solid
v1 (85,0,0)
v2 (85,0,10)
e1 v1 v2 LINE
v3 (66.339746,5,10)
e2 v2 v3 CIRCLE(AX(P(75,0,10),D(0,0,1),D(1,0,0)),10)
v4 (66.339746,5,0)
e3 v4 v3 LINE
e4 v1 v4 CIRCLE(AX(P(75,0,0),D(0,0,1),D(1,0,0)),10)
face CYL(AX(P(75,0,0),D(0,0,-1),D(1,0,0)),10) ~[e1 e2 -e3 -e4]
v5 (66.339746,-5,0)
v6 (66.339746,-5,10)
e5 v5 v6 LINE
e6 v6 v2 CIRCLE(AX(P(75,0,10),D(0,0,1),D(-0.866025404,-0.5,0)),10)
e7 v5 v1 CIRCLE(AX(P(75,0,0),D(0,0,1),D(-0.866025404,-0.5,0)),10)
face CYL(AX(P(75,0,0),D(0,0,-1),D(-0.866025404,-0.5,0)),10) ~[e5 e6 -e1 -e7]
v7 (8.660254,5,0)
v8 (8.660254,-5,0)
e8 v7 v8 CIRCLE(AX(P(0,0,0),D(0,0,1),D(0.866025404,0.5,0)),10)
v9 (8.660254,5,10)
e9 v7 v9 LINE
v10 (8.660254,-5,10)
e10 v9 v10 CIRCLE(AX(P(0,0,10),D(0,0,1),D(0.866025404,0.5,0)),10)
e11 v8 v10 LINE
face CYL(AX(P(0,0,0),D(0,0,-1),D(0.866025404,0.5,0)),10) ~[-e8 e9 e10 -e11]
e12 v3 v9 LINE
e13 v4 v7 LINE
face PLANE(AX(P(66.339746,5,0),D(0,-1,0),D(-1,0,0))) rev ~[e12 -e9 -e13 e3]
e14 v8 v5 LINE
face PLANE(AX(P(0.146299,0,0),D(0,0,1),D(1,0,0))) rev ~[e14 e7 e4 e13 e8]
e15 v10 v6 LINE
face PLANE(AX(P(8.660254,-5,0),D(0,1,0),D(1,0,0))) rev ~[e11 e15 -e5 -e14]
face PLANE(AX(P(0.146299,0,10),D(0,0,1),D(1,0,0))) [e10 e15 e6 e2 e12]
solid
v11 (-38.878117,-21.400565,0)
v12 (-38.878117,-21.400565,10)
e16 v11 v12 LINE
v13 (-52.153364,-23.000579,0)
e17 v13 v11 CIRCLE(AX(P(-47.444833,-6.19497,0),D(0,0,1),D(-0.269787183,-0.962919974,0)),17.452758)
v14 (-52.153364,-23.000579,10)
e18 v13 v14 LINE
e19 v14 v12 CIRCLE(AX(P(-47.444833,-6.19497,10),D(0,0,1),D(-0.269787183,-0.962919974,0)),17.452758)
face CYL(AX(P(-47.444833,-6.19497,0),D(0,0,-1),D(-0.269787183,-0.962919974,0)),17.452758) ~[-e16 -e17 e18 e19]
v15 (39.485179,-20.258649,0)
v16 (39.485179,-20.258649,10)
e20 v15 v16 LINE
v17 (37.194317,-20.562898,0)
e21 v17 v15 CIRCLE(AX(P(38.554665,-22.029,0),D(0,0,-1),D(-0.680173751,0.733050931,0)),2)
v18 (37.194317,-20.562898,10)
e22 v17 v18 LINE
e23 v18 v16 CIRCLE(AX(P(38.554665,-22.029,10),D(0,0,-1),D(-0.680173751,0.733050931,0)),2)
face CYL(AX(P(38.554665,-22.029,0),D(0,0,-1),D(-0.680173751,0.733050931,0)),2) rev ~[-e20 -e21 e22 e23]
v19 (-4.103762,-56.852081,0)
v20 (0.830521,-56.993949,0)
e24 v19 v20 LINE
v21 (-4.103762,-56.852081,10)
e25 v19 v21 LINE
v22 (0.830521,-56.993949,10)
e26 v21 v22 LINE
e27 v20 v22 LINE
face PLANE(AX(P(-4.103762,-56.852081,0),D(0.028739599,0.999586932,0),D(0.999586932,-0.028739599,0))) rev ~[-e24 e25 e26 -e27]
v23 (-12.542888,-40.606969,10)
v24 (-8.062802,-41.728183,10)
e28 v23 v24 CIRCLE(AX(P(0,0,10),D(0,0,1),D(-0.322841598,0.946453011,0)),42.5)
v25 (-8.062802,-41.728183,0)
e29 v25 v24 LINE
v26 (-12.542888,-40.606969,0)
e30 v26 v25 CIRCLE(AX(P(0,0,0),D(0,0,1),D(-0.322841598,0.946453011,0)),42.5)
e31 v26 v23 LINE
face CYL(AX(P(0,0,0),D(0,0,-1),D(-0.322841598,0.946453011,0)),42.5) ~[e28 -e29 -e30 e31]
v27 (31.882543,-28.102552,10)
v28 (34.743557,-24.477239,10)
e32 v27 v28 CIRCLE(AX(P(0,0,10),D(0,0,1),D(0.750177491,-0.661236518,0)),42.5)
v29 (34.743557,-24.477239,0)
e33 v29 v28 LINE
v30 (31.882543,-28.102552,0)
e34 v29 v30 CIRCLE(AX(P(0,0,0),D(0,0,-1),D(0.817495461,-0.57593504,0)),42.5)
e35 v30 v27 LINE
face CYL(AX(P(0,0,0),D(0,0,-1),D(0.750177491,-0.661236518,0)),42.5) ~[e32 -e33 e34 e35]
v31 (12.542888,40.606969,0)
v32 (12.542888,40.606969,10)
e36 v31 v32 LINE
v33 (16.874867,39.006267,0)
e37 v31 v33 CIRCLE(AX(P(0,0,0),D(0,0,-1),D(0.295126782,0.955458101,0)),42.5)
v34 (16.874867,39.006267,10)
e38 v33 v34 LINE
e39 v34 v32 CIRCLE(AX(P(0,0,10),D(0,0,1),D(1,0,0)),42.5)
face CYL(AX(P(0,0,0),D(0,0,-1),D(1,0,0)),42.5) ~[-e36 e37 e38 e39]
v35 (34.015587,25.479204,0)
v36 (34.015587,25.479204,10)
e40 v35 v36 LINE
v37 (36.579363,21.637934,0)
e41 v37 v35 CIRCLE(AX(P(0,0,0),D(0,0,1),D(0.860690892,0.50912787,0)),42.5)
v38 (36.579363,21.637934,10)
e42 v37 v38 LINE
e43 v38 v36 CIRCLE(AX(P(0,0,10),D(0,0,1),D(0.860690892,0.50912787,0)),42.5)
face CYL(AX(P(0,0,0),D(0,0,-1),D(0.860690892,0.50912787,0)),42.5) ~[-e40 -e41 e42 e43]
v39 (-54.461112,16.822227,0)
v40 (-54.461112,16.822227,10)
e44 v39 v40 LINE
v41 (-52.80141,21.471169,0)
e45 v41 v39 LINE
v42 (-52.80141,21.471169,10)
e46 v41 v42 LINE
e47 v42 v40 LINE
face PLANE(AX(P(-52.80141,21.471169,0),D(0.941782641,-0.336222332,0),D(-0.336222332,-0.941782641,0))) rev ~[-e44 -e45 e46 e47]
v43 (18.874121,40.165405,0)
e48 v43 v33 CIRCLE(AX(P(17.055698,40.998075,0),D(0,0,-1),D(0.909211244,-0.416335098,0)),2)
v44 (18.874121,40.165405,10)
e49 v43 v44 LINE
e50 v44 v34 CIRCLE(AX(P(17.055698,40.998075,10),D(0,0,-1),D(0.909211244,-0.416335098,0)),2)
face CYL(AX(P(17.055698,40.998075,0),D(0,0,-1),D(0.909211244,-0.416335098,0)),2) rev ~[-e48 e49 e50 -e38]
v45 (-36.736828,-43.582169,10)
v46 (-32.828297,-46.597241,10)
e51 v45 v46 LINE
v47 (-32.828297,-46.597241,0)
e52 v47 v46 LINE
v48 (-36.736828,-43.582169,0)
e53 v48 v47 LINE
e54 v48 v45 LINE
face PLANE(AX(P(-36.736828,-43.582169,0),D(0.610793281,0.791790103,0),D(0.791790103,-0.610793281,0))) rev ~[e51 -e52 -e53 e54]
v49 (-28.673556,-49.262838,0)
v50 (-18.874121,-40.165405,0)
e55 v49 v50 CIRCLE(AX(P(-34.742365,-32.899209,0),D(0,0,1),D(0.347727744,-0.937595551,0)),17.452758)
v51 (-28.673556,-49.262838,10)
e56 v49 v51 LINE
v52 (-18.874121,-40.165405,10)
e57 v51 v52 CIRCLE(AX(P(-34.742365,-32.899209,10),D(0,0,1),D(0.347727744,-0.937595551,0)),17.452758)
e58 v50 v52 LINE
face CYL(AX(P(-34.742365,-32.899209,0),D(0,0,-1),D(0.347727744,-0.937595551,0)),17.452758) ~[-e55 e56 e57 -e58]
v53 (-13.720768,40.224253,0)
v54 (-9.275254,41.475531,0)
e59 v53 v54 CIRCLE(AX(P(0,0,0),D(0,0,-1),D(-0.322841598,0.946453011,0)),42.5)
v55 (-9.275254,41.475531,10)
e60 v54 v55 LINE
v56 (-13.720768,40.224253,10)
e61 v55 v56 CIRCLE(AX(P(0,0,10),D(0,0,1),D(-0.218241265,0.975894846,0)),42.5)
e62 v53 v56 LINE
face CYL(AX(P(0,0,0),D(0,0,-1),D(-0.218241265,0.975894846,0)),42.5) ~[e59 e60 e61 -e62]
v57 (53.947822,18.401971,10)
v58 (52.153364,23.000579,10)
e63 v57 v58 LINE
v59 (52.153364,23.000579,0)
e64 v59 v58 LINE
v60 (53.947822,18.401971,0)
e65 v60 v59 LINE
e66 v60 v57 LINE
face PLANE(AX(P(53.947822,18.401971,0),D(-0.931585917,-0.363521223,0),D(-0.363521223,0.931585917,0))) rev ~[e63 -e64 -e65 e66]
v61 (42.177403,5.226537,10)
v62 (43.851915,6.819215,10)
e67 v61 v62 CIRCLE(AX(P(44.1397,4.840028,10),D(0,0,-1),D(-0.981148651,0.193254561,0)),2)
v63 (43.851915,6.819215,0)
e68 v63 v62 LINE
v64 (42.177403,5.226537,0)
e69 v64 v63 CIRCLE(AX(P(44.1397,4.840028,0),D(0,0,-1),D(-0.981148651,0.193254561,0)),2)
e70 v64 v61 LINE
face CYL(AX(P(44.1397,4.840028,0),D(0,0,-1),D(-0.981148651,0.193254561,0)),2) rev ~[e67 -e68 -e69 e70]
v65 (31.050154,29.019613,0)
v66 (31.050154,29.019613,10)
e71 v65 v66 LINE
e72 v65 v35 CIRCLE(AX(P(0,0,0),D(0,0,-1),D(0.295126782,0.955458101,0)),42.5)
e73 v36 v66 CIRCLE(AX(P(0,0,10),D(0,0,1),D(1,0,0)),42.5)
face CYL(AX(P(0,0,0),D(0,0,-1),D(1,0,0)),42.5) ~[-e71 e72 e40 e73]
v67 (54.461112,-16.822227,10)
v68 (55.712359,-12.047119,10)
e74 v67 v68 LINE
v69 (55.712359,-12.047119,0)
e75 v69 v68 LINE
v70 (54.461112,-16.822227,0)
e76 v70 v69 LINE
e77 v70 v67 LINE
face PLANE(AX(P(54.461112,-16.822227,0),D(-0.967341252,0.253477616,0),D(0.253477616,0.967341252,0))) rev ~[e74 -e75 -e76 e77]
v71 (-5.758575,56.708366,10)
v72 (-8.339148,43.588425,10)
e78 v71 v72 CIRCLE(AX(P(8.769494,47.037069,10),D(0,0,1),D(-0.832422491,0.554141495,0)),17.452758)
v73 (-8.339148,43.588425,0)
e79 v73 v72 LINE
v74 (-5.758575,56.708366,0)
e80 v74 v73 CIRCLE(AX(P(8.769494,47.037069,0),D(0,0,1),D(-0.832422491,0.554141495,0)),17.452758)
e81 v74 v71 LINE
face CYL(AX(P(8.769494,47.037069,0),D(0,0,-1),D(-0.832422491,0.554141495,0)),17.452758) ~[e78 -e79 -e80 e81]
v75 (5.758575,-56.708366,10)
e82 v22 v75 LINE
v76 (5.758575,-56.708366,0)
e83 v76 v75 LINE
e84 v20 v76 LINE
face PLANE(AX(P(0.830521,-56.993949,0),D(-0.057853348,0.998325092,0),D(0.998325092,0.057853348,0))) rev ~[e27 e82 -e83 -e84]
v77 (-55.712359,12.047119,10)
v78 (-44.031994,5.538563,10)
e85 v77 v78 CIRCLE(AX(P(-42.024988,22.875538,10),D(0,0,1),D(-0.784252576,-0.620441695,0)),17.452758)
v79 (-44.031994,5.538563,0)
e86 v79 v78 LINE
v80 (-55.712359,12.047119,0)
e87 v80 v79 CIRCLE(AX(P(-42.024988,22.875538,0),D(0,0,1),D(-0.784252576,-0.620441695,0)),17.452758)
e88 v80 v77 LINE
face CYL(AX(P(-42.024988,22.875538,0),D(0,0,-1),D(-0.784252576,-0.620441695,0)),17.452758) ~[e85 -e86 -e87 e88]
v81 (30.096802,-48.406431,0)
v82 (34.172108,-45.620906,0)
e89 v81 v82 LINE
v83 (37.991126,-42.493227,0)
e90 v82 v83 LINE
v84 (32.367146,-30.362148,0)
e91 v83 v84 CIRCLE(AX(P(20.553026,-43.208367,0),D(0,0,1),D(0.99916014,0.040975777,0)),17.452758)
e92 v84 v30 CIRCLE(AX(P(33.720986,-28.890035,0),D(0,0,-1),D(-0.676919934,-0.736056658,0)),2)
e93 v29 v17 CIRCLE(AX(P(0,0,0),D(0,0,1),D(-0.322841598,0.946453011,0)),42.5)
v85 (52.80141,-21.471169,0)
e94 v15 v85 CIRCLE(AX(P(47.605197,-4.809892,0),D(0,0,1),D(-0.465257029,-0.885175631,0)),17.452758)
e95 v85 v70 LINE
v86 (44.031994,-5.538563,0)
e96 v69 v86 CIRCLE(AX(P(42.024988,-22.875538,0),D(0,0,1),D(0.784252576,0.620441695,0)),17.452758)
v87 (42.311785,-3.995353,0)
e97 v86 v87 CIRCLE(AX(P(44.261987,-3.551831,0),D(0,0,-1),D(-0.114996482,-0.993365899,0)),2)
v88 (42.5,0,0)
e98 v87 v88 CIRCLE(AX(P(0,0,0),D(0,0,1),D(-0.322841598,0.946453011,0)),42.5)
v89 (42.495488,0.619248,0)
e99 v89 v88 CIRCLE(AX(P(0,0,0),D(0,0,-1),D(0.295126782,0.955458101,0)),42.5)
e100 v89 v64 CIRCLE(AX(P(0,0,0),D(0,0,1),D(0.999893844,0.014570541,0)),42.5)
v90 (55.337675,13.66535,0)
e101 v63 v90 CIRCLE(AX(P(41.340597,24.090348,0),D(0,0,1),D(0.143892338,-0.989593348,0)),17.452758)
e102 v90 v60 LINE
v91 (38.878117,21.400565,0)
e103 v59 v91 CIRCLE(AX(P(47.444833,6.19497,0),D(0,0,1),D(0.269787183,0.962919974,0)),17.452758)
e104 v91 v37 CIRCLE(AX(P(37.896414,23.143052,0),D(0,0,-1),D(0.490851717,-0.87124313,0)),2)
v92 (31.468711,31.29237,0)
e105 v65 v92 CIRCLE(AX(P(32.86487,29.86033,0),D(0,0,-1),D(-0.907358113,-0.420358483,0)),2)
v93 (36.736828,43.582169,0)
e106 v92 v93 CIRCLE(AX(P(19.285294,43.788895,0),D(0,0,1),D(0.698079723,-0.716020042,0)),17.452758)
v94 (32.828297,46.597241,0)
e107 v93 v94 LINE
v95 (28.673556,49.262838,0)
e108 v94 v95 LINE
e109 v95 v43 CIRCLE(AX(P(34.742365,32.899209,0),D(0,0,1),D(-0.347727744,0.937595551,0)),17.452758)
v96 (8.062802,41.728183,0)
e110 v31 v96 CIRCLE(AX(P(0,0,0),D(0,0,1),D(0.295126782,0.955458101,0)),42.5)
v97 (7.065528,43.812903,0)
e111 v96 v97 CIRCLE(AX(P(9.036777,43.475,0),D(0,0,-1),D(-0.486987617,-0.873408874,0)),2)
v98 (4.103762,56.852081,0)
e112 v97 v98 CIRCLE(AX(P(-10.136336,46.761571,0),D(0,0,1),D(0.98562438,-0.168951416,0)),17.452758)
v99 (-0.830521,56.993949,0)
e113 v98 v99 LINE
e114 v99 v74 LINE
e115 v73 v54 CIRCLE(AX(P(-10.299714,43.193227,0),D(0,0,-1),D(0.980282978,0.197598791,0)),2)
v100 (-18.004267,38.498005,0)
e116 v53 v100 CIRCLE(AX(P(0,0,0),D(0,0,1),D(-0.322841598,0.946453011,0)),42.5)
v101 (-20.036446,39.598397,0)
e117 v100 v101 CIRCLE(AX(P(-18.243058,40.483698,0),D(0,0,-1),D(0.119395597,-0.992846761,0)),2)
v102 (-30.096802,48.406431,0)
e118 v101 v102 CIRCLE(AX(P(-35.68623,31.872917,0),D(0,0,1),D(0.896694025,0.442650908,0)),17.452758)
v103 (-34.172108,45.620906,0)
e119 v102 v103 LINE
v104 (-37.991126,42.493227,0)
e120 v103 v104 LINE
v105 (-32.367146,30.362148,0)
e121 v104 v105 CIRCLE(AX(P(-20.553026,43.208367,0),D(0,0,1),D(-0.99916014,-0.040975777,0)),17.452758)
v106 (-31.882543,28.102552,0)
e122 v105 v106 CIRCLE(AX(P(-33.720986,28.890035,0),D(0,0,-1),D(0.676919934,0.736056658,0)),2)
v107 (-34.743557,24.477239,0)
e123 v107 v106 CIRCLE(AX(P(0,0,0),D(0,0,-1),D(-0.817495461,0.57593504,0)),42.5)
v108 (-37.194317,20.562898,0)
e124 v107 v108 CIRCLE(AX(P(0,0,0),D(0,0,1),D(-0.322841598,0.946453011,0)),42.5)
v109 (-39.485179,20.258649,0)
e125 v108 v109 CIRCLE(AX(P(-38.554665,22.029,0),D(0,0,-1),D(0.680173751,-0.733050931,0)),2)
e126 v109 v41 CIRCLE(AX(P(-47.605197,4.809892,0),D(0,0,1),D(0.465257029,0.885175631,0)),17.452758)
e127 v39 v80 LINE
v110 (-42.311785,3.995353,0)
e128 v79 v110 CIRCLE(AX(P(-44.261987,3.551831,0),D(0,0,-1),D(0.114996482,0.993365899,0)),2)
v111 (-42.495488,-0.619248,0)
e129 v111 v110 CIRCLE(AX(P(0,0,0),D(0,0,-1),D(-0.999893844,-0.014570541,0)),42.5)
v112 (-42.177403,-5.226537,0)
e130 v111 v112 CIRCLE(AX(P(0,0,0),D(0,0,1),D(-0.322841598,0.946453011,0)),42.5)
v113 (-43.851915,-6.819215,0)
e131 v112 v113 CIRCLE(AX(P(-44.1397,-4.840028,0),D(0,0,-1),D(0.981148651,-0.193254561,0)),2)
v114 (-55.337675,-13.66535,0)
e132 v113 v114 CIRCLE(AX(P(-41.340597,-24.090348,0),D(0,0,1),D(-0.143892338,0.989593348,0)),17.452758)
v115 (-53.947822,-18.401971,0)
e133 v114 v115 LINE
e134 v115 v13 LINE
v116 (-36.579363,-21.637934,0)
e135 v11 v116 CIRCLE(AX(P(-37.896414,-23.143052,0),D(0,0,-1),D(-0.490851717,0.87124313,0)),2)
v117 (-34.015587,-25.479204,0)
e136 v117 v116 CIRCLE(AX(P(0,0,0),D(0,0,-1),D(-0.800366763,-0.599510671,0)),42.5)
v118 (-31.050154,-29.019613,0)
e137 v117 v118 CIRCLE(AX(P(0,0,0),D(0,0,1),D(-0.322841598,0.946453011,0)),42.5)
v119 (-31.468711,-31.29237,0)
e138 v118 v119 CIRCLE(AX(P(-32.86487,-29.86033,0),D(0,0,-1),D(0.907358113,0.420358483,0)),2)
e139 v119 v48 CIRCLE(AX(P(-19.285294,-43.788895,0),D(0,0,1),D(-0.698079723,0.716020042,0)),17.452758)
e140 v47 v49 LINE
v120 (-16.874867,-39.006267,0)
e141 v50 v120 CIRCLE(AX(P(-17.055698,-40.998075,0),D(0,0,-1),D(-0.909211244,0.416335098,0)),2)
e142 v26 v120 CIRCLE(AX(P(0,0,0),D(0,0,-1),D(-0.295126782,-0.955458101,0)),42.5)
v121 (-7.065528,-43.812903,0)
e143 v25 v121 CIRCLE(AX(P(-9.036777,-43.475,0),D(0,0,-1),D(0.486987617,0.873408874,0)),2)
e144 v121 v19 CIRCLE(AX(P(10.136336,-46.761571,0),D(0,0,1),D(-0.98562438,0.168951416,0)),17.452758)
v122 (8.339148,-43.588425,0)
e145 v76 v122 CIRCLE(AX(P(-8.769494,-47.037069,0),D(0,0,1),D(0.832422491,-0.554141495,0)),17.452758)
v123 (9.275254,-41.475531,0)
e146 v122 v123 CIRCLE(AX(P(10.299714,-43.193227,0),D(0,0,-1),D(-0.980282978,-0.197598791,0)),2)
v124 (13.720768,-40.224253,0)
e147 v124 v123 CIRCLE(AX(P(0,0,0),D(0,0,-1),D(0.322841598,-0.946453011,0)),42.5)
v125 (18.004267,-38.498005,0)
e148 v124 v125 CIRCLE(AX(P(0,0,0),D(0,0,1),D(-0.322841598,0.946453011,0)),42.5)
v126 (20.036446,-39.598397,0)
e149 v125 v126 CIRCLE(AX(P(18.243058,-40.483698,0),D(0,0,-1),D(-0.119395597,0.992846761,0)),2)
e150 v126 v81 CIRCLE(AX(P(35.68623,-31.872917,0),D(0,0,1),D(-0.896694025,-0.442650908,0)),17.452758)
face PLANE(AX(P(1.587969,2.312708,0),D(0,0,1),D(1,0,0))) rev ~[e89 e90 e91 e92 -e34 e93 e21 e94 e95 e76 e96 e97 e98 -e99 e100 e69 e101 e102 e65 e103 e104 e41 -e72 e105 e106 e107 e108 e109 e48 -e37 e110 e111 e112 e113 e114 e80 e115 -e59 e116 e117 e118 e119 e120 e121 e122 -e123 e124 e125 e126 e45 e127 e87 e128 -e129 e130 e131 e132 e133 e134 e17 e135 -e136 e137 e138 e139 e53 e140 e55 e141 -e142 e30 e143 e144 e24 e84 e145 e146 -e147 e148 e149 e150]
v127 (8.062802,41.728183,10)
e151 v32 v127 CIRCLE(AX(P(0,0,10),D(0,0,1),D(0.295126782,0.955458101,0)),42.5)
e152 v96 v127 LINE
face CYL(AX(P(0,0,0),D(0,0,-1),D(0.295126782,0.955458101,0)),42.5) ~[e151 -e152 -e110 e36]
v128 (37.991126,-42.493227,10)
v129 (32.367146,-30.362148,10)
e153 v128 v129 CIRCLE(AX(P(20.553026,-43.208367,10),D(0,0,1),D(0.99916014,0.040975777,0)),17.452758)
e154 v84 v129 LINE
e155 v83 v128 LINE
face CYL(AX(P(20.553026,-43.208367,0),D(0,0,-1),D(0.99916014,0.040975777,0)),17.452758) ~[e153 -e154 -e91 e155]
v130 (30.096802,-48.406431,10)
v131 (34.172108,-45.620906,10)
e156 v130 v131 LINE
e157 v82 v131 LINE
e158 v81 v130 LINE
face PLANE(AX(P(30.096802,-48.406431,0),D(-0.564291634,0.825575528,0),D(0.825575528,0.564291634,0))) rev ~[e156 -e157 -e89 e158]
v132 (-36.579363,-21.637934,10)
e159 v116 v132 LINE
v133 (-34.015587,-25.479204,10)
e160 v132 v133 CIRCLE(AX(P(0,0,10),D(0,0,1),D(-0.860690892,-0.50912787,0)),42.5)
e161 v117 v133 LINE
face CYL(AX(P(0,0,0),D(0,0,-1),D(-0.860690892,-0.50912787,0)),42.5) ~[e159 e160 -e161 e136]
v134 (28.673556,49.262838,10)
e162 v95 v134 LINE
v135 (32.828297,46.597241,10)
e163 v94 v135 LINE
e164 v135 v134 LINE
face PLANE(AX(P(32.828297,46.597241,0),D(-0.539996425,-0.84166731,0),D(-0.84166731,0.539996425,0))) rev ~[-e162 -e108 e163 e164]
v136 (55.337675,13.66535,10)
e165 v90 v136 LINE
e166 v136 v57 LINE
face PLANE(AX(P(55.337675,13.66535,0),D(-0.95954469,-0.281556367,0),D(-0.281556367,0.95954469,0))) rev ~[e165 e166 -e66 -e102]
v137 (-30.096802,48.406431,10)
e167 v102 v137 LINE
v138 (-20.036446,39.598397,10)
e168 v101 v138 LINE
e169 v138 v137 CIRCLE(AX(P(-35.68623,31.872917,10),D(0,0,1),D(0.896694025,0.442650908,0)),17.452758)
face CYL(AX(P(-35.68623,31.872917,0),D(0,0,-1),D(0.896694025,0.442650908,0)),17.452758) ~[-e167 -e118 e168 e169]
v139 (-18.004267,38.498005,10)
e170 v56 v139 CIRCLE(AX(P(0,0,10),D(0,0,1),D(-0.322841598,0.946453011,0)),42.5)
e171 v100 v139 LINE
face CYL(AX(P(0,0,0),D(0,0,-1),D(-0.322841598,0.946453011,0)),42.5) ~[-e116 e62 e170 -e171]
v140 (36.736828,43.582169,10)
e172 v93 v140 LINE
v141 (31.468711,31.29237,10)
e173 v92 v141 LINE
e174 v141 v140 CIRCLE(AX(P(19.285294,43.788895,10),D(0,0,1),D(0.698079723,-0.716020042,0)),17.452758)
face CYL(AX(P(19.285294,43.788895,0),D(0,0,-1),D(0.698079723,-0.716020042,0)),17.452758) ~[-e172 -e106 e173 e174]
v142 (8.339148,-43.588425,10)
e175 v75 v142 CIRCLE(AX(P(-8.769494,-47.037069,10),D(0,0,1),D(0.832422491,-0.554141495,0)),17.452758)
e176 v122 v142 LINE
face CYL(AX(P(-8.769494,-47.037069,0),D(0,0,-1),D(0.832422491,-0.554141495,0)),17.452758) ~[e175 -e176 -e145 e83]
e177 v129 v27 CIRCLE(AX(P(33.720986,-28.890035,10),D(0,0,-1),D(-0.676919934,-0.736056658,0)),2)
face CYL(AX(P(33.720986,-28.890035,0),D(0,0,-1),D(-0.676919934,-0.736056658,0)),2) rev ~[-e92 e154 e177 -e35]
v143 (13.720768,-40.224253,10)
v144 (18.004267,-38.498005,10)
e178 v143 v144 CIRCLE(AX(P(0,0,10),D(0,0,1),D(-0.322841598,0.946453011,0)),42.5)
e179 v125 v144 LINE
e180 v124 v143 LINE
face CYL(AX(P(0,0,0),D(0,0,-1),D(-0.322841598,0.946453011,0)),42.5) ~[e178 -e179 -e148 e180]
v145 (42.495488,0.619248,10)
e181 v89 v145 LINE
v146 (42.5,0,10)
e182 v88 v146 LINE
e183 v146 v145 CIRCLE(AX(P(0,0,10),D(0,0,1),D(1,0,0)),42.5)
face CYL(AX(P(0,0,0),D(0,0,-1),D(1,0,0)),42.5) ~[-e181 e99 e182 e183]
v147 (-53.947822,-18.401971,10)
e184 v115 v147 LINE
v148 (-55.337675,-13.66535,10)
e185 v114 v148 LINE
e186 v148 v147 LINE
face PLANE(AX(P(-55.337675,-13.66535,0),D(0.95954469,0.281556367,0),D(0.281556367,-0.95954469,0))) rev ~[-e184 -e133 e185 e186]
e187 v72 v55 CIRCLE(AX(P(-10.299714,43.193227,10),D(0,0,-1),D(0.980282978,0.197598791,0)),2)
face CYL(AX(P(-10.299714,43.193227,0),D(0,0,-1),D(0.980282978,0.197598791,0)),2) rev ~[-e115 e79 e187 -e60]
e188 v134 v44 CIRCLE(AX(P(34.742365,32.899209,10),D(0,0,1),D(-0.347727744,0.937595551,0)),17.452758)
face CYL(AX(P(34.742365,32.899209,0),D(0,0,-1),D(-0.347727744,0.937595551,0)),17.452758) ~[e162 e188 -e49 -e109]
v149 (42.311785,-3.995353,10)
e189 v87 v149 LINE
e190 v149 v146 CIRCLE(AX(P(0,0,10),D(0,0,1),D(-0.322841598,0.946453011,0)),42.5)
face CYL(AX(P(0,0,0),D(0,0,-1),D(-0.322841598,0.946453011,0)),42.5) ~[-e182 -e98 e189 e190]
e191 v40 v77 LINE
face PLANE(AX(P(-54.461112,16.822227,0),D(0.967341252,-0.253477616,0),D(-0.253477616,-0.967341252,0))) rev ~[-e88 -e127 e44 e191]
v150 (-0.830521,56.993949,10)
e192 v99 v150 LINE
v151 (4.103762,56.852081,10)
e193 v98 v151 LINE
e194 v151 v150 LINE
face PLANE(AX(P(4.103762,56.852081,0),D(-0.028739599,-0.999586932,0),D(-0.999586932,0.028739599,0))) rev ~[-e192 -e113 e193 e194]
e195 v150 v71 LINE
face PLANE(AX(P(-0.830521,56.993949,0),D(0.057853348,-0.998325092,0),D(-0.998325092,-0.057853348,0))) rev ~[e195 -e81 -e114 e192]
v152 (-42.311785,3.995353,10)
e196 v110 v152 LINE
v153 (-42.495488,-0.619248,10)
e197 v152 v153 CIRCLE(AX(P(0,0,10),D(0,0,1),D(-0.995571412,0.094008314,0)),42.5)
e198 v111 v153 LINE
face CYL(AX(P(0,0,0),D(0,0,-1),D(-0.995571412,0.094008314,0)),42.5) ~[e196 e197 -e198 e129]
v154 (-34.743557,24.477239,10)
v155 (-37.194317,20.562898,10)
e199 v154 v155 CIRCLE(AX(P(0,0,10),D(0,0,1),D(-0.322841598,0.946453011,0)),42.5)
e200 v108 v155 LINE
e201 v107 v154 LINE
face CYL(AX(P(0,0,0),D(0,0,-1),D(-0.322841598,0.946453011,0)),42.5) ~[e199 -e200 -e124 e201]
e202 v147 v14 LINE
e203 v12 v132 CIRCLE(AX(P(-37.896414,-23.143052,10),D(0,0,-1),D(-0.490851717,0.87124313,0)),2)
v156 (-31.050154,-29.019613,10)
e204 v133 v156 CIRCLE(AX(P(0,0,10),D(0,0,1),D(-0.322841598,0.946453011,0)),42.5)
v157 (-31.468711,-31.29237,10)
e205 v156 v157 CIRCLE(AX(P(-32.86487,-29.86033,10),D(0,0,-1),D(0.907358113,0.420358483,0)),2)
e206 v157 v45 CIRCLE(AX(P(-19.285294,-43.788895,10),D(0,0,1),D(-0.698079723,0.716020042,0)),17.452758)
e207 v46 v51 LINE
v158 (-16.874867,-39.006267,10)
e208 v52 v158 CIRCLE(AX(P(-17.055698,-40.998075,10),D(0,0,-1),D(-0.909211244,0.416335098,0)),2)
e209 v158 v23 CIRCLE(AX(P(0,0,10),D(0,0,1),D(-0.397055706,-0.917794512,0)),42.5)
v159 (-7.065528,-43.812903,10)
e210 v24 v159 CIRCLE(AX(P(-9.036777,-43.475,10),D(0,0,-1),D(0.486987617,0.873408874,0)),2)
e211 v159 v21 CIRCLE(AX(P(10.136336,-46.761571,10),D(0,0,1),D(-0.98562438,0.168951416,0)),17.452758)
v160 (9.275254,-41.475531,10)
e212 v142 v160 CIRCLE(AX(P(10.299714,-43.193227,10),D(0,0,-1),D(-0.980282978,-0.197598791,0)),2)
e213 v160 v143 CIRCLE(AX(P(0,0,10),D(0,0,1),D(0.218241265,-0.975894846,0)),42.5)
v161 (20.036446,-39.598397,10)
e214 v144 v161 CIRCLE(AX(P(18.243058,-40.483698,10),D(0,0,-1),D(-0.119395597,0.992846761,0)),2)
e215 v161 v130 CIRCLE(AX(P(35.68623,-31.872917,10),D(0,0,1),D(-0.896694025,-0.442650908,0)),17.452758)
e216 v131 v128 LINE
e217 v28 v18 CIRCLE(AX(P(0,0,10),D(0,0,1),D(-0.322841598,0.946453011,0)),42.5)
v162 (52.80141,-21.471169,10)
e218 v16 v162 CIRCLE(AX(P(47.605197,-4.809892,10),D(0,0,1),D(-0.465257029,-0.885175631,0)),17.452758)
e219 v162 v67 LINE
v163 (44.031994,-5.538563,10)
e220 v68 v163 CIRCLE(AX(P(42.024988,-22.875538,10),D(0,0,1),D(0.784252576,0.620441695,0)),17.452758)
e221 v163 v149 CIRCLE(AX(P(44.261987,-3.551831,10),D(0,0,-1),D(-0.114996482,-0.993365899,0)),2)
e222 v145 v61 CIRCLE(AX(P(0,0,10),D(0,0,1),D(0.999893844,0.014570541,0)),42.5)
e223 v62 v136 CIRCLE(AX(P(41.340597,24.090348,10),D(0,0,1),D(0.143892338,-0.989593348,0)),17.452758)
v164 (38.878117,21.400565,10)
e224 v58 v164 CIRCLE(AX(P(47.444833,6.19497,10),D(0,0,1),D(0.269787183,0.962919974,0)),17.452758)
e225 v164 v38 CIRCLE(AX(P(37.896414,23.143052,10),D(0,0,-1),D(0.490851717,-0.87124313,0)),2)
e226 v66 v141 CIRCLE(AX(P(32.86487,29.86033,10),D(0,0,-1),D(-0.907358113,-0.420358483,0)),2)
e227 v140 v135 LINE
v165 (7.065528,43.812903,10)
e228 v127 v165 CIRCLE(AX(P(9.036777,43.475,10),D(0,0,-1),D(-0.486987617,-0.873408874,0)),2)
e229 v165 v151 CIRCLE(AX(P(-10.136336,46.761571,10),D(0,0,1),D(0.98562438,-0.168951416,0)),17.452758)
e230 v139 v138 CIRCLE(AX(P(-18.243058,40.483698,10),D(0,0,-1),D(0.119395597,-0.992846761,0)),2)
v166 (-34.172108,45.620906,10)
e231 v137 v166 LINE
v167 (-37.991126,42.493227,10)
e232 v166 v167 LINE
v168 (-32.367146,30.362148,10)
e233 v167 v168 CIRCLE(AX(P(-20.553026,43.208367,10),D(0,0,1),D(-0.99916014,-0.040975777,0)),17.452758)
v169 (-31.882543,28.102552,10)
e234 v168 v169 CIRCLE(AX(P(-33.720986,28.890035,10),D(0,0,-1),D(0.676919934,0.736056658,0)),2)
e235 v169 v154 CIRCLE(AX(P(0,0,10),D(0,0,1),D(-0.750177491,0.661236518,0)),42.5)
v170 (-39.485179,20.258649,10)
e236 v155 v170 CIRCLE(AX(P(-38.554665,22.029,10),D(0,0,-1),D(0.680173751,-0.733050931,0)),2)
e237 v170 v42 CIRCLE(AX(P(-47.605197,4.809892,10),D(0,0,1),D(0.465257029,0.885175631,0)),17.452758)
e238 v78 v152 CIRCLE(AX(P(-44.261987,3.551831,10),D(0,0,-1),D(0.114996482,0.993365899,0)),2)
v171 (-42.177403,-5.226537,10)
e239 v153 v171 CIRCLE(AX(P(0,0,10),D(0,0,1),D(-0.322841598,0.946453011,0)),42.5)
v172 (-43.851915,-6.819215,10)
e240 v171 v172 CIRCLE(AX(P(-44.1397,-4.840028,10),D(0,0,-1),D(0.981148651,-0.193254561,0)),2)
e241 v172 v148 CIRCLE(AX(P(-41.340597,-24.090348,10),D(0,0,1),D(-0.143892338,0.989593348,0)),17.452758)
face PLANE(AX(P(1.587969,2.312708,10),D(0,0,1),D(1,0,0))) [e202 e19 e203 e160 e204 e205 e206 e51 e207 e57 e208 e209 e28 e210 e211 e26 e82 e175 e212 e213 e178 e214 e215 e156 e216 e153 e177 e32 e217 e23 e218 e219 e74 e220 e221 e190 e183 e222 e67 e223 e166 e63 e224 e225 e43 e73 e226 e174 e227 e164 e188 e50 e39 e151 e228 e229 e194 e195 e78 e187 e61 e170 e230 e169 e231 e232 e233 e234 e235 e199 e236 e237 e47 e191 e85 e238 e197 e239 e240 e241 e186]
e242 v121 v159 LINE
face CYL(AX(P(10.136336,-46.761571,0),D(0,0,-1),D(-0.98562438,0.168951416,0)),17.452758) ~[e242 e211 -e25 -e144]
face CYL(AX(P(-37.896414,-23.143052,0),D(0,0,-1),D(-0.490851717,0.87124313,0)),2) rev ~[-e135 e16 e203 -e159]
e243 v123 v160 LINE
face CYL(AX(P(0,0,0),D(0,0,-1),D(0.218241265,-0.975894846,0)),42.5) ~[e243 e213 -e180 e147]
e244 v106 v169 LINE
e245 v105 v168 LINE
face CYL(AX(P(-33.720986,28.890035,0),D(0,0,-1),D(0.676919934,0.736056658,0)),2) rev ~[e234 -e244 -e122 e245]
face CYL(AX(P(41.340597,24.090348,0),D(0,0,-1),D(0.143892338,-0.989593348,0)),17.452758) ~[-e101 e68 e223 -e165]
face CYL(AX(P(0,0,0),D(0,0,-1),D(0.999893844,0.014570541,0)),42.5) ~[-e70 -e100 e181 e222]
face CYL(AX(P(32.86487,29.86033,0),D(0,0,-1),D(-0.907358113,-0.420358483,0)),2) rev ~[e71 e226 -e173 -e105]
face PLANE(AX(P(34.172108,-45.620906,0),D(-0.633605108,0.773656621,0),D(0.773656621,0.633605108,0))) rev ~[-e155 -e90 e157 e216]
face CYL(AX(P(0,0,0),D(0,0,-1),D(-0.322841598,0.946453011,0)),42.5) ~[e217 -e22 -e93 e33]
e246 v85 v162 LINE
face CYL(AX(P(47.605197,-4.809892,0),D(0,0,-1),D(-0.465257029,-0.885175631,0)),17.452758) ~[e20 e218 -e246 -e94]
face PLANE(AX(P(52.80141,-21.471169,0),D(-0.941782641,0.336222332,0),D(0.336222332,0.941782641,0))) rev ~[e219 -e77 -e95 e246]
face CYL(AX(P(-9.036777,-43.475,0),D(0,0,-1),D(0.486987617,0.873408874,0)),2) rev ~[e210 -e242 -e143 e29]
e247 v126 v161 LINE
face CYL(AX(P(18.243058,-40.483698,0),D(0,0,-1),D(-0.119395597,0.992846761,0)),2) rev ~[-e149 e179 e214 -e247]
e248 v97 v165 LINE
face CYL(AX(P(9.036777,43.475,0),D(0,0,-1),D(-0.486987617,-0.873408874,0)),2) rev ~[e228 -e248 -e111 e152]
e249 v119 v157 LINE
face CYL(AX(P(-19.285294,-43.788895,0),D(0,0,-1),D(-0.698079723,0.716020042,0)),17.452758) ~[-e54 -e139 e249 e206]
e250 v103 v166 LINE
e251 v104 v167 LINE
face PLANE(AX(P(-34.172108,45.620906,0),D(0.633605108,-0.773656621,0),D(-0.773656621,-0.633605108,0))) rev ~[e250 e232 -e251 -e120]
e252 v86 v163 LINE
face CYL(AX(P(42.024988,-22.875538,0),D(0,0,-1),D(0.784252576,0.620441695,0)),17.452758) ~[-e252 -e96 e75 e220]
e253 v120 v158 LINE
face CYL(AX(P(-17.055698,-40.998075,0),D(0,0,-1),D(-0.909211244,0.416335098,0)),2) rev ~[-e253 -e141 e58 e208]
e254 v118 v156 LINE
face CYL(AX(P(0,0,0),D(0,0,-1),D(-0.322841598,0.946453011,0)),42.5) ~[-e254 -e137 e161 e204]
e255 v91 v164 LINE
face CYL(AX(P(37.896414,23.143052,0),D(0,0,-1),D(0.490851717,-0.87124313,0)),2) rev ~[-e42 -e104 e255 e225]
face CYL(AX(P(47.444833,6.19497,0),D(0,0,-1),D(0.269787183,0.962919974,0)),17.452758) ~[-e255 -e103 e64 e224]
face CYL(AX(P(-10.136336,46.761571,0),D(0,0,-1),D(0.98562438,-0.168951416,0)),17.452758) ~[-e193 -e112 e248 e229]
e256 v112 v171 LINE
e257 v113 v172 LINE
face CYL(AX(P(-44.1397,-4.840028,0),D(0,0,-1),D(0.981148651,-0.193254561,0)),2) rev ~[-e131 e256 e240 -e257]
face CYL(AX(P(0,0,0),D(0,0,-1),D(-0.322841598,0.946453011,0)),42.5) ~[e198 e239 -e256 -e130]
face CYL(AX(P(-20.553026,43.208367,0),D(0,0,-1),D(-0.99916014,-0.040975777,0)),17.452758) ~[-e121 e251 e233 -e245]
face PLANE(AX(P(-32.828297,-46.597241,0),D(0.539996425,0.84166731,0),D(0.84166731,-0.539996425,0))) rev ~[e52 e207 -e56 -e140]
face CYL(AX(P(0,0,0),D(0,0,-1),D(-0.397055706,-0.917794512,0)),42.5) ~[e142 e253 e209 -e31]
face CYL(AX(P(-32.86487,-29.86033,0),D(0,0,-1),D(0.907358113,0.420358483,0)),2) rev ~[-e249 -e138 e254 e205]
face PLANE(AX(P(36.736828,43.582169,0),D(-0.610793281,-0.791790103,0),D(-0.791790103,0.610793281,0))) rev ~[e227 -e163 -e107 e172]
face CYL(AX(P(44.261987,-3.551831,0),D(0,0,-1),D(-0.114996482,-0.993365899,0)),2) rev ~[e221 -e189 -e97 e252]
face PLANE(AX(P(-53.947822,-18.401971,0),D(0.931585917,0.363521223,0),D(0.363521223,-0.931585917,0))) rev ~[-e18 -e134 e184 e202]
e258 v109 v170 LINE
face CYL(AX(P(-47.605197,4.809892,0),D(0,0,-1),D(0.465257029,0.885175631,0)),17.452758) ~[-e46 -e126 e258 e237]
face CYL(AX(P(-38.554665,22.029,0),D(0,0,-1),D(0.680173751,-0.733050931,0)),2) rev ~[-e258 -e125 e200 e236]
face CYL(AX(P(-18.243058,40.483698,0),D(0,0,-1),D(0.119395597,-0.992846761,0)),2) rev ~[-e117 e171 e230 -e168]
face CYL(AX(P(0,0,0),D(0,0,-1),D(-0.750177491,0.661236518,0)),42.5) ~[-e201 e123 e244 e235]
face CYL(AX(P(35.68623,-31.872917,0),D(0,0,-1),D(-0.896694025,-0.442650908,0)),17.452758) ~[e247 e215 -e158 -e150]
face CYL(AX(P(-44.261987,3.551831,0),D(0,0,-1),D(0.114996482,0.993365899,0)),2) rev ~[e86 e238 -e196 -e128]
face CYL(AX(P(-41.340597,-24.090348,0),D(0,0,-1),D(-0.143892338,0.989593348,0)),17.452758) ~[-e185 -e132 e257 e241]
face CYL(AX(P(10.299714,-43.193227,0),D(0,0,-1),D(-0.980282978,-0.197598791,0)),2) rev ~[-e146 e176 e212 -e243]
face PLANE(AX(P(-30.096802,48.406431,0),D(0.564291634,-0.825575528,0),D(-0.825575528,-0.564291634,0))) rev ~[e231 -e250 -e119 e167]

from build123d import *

# Parameters (mm, degrees)
F4_DEPTH = 10
F7_DEPTH = 10
F8_COUNT = 10


# Not quite as in the source:
# - a feature names something its author has since deleted; it is built from what else it names


with BuildPart() as f4:
    # F3 (on Top) → F4 (new body)
    with BuildSketch(Plane.XY):
        with BuildLine():
            Line((0, 5), (8.6602540378, 5))
            ThreePointArc((8.6602540378, 5), (-10, 0), (8.6602540378, -5))
            Line((8.6602540378, -5), (0, -5))
            Line((0, -5), (0, 5))
        make_face()
        with BuildLine():
            ThreePointArc((8.6602540378, 5), (9.6592582629, 2.588190451), (10, 0))
            ThreePointArc((10, 0), (9.6592582629, -2.588190451), (8.6602540378, -5))
            Line((8.6602540378, -5), (66.3397459622, -5))
            ThreePointArc((66.3397459622, -5), (65, 0), (66.3397459622, 5))
            Line((66.3397459622, 5), (8.6602540378, 5))
        make_face()
        with BuildLine():
            ThreePointArc((85, 0), (77.588190451, 9.6592582629), (66.3397459622, 5))
            Line((66.3397459622, 5), (75, 5))
            Line((75, 5), (75, -5))
            Line((75, -5), (66.3397459622, -5))
            ThreePointArc((66.3397459622, -5), (77.588190451, -9.6592582629), (85, 0))
        make_face()
        with BuildLine():
            Line((75, 5), (66.3397459622, 5))
            ThreePointArc((66.3397459622, 5), (65, 0), (66.3397459622, -5))
            Line((66.3397459622, -5), (75, -5))
            Line((75, -5), (75, 5))
        make_face()
        with BuildLine():
            ThreePointArc((8.6602540378, -5), (9.6592582629, -2.588190451), (10, 0))
            ThreePointArc((10, 0), (9.6592582629, 2.588190451), (8.6602540378, 5))
            Line((8.6602540378, 5), (0, 5))
            Line((0, 5), (0, -5))
            Line((0, -5), (8.6602540378, -5))
        make_face()
    extrude(amount=F4_DEPTH)


with BuildPart() as f7:
    # F5 (on Top) → F7 (new body)
    with BuildSketch(Plane.XY):
        with BuildLine():
            ThreePointArc((-13.7207679114, 40.2242529815), (-24.7297125313, -34.5643069961), (42.5, 0))
            ThreePointArc((42.5, 0), (34.2003125005, 25.2307079739), (12.5428882416, 40.6069692855))
            Line((12.5428882416, 40.6069692855), (8.5840838738, 41.526906744))
            ThreePointArc((8.5840838738, 41.526906744), (8.3163788428, 41.6092495204), (8.0628019611, 41.7281826172))
            ThreePointArc((8.0628019611, 41.7281826172), (-0.6192479887, 42.4954883715), (-9.2752537824, 41.4755309462))
            ThreePointArc((-9.2752537824, 41.4755309462), (-9.5252575239, 41.3492596284), (-9.7904495841, 41.2591514287))
            Line((-9.7904495841, 41.2591514287), (-13.7207679114, 40.2242529815))
        make_face()
        with BuildLine():
            Line((8.5840838738, 41.526906744), (12.5428882416, 40.6069692855))
            ThreePointArc((12.5428882416, 40.6069692855), (10.3180859183, 41.2284744198), (8.0628019611, 41.7281826172))
            ThreePointArc((8.0628019611, 41.7281826172), (8.3163788428, 41.6092495204), (8.5840838738, 41.526906744))
        make_face()
        with BuildLine():
            ThreePointArc((-9.2752537824, 41.4755309462), (-11.5150196514, 40.910320488), (-13.7207679114, 40.2242529815))
            Line((-13.7207679114, 40.2242529815), (-9.7904495841, 41.2591514287))
            ThreePointArc((-9.7904495841, 41.2591514287), (-9.5252575239, 41.3492596284), (-9.2752537824, 41.4755309462))
        make_face()
        with BuildLine():
            ThreePointArc((-9.2752537824, 41.4755309462), (-0.6192479887, 42.4954883715), (8.0628019611, 41.7281826172))
            ThreePointArc((8.0628019611, 41.7281826172), (7.2325873296, 42.6119250894), (7.0655284339, 43.8129031978))
            ThreePointArc((7.0655284339, 43.8129031978), (6.8828970608, 50.6273818317), (4.1037621109, 56.8520811979))
            Line((4.1037621109, 56.8520811979), (-0.8305208318, 56.99394911))
            Line((-0.8305208318, 56.99394911), (-5.758574926, 56.7083663565))
            ThreePointArc((-5.758574926, 56.7083663565), (-8.3551546341, 50.4053316041), (-8.3391482628, 43.5884248961))
            ThreePointArc((-8.3391482628, 43.5884248961), (-8.471142139, 42.3830889644), (-9.2752537824, 41.4755309462))
        make_face()
    extrude(amount=F7_DEPTH)

    # F8: F7 ×10 about axis
    f8_axis = Axis((0, 0, -2.4173539132), (0, 0, 1))


with BuildPart() as f7_1:
    add(f7.part)
    for i in range(1, F8_COUNT):
        add(f7.part.rotate(f8_axis, i * 360 / F8_COUNT))


solid = Compound([f4.part, f7_1.part])
